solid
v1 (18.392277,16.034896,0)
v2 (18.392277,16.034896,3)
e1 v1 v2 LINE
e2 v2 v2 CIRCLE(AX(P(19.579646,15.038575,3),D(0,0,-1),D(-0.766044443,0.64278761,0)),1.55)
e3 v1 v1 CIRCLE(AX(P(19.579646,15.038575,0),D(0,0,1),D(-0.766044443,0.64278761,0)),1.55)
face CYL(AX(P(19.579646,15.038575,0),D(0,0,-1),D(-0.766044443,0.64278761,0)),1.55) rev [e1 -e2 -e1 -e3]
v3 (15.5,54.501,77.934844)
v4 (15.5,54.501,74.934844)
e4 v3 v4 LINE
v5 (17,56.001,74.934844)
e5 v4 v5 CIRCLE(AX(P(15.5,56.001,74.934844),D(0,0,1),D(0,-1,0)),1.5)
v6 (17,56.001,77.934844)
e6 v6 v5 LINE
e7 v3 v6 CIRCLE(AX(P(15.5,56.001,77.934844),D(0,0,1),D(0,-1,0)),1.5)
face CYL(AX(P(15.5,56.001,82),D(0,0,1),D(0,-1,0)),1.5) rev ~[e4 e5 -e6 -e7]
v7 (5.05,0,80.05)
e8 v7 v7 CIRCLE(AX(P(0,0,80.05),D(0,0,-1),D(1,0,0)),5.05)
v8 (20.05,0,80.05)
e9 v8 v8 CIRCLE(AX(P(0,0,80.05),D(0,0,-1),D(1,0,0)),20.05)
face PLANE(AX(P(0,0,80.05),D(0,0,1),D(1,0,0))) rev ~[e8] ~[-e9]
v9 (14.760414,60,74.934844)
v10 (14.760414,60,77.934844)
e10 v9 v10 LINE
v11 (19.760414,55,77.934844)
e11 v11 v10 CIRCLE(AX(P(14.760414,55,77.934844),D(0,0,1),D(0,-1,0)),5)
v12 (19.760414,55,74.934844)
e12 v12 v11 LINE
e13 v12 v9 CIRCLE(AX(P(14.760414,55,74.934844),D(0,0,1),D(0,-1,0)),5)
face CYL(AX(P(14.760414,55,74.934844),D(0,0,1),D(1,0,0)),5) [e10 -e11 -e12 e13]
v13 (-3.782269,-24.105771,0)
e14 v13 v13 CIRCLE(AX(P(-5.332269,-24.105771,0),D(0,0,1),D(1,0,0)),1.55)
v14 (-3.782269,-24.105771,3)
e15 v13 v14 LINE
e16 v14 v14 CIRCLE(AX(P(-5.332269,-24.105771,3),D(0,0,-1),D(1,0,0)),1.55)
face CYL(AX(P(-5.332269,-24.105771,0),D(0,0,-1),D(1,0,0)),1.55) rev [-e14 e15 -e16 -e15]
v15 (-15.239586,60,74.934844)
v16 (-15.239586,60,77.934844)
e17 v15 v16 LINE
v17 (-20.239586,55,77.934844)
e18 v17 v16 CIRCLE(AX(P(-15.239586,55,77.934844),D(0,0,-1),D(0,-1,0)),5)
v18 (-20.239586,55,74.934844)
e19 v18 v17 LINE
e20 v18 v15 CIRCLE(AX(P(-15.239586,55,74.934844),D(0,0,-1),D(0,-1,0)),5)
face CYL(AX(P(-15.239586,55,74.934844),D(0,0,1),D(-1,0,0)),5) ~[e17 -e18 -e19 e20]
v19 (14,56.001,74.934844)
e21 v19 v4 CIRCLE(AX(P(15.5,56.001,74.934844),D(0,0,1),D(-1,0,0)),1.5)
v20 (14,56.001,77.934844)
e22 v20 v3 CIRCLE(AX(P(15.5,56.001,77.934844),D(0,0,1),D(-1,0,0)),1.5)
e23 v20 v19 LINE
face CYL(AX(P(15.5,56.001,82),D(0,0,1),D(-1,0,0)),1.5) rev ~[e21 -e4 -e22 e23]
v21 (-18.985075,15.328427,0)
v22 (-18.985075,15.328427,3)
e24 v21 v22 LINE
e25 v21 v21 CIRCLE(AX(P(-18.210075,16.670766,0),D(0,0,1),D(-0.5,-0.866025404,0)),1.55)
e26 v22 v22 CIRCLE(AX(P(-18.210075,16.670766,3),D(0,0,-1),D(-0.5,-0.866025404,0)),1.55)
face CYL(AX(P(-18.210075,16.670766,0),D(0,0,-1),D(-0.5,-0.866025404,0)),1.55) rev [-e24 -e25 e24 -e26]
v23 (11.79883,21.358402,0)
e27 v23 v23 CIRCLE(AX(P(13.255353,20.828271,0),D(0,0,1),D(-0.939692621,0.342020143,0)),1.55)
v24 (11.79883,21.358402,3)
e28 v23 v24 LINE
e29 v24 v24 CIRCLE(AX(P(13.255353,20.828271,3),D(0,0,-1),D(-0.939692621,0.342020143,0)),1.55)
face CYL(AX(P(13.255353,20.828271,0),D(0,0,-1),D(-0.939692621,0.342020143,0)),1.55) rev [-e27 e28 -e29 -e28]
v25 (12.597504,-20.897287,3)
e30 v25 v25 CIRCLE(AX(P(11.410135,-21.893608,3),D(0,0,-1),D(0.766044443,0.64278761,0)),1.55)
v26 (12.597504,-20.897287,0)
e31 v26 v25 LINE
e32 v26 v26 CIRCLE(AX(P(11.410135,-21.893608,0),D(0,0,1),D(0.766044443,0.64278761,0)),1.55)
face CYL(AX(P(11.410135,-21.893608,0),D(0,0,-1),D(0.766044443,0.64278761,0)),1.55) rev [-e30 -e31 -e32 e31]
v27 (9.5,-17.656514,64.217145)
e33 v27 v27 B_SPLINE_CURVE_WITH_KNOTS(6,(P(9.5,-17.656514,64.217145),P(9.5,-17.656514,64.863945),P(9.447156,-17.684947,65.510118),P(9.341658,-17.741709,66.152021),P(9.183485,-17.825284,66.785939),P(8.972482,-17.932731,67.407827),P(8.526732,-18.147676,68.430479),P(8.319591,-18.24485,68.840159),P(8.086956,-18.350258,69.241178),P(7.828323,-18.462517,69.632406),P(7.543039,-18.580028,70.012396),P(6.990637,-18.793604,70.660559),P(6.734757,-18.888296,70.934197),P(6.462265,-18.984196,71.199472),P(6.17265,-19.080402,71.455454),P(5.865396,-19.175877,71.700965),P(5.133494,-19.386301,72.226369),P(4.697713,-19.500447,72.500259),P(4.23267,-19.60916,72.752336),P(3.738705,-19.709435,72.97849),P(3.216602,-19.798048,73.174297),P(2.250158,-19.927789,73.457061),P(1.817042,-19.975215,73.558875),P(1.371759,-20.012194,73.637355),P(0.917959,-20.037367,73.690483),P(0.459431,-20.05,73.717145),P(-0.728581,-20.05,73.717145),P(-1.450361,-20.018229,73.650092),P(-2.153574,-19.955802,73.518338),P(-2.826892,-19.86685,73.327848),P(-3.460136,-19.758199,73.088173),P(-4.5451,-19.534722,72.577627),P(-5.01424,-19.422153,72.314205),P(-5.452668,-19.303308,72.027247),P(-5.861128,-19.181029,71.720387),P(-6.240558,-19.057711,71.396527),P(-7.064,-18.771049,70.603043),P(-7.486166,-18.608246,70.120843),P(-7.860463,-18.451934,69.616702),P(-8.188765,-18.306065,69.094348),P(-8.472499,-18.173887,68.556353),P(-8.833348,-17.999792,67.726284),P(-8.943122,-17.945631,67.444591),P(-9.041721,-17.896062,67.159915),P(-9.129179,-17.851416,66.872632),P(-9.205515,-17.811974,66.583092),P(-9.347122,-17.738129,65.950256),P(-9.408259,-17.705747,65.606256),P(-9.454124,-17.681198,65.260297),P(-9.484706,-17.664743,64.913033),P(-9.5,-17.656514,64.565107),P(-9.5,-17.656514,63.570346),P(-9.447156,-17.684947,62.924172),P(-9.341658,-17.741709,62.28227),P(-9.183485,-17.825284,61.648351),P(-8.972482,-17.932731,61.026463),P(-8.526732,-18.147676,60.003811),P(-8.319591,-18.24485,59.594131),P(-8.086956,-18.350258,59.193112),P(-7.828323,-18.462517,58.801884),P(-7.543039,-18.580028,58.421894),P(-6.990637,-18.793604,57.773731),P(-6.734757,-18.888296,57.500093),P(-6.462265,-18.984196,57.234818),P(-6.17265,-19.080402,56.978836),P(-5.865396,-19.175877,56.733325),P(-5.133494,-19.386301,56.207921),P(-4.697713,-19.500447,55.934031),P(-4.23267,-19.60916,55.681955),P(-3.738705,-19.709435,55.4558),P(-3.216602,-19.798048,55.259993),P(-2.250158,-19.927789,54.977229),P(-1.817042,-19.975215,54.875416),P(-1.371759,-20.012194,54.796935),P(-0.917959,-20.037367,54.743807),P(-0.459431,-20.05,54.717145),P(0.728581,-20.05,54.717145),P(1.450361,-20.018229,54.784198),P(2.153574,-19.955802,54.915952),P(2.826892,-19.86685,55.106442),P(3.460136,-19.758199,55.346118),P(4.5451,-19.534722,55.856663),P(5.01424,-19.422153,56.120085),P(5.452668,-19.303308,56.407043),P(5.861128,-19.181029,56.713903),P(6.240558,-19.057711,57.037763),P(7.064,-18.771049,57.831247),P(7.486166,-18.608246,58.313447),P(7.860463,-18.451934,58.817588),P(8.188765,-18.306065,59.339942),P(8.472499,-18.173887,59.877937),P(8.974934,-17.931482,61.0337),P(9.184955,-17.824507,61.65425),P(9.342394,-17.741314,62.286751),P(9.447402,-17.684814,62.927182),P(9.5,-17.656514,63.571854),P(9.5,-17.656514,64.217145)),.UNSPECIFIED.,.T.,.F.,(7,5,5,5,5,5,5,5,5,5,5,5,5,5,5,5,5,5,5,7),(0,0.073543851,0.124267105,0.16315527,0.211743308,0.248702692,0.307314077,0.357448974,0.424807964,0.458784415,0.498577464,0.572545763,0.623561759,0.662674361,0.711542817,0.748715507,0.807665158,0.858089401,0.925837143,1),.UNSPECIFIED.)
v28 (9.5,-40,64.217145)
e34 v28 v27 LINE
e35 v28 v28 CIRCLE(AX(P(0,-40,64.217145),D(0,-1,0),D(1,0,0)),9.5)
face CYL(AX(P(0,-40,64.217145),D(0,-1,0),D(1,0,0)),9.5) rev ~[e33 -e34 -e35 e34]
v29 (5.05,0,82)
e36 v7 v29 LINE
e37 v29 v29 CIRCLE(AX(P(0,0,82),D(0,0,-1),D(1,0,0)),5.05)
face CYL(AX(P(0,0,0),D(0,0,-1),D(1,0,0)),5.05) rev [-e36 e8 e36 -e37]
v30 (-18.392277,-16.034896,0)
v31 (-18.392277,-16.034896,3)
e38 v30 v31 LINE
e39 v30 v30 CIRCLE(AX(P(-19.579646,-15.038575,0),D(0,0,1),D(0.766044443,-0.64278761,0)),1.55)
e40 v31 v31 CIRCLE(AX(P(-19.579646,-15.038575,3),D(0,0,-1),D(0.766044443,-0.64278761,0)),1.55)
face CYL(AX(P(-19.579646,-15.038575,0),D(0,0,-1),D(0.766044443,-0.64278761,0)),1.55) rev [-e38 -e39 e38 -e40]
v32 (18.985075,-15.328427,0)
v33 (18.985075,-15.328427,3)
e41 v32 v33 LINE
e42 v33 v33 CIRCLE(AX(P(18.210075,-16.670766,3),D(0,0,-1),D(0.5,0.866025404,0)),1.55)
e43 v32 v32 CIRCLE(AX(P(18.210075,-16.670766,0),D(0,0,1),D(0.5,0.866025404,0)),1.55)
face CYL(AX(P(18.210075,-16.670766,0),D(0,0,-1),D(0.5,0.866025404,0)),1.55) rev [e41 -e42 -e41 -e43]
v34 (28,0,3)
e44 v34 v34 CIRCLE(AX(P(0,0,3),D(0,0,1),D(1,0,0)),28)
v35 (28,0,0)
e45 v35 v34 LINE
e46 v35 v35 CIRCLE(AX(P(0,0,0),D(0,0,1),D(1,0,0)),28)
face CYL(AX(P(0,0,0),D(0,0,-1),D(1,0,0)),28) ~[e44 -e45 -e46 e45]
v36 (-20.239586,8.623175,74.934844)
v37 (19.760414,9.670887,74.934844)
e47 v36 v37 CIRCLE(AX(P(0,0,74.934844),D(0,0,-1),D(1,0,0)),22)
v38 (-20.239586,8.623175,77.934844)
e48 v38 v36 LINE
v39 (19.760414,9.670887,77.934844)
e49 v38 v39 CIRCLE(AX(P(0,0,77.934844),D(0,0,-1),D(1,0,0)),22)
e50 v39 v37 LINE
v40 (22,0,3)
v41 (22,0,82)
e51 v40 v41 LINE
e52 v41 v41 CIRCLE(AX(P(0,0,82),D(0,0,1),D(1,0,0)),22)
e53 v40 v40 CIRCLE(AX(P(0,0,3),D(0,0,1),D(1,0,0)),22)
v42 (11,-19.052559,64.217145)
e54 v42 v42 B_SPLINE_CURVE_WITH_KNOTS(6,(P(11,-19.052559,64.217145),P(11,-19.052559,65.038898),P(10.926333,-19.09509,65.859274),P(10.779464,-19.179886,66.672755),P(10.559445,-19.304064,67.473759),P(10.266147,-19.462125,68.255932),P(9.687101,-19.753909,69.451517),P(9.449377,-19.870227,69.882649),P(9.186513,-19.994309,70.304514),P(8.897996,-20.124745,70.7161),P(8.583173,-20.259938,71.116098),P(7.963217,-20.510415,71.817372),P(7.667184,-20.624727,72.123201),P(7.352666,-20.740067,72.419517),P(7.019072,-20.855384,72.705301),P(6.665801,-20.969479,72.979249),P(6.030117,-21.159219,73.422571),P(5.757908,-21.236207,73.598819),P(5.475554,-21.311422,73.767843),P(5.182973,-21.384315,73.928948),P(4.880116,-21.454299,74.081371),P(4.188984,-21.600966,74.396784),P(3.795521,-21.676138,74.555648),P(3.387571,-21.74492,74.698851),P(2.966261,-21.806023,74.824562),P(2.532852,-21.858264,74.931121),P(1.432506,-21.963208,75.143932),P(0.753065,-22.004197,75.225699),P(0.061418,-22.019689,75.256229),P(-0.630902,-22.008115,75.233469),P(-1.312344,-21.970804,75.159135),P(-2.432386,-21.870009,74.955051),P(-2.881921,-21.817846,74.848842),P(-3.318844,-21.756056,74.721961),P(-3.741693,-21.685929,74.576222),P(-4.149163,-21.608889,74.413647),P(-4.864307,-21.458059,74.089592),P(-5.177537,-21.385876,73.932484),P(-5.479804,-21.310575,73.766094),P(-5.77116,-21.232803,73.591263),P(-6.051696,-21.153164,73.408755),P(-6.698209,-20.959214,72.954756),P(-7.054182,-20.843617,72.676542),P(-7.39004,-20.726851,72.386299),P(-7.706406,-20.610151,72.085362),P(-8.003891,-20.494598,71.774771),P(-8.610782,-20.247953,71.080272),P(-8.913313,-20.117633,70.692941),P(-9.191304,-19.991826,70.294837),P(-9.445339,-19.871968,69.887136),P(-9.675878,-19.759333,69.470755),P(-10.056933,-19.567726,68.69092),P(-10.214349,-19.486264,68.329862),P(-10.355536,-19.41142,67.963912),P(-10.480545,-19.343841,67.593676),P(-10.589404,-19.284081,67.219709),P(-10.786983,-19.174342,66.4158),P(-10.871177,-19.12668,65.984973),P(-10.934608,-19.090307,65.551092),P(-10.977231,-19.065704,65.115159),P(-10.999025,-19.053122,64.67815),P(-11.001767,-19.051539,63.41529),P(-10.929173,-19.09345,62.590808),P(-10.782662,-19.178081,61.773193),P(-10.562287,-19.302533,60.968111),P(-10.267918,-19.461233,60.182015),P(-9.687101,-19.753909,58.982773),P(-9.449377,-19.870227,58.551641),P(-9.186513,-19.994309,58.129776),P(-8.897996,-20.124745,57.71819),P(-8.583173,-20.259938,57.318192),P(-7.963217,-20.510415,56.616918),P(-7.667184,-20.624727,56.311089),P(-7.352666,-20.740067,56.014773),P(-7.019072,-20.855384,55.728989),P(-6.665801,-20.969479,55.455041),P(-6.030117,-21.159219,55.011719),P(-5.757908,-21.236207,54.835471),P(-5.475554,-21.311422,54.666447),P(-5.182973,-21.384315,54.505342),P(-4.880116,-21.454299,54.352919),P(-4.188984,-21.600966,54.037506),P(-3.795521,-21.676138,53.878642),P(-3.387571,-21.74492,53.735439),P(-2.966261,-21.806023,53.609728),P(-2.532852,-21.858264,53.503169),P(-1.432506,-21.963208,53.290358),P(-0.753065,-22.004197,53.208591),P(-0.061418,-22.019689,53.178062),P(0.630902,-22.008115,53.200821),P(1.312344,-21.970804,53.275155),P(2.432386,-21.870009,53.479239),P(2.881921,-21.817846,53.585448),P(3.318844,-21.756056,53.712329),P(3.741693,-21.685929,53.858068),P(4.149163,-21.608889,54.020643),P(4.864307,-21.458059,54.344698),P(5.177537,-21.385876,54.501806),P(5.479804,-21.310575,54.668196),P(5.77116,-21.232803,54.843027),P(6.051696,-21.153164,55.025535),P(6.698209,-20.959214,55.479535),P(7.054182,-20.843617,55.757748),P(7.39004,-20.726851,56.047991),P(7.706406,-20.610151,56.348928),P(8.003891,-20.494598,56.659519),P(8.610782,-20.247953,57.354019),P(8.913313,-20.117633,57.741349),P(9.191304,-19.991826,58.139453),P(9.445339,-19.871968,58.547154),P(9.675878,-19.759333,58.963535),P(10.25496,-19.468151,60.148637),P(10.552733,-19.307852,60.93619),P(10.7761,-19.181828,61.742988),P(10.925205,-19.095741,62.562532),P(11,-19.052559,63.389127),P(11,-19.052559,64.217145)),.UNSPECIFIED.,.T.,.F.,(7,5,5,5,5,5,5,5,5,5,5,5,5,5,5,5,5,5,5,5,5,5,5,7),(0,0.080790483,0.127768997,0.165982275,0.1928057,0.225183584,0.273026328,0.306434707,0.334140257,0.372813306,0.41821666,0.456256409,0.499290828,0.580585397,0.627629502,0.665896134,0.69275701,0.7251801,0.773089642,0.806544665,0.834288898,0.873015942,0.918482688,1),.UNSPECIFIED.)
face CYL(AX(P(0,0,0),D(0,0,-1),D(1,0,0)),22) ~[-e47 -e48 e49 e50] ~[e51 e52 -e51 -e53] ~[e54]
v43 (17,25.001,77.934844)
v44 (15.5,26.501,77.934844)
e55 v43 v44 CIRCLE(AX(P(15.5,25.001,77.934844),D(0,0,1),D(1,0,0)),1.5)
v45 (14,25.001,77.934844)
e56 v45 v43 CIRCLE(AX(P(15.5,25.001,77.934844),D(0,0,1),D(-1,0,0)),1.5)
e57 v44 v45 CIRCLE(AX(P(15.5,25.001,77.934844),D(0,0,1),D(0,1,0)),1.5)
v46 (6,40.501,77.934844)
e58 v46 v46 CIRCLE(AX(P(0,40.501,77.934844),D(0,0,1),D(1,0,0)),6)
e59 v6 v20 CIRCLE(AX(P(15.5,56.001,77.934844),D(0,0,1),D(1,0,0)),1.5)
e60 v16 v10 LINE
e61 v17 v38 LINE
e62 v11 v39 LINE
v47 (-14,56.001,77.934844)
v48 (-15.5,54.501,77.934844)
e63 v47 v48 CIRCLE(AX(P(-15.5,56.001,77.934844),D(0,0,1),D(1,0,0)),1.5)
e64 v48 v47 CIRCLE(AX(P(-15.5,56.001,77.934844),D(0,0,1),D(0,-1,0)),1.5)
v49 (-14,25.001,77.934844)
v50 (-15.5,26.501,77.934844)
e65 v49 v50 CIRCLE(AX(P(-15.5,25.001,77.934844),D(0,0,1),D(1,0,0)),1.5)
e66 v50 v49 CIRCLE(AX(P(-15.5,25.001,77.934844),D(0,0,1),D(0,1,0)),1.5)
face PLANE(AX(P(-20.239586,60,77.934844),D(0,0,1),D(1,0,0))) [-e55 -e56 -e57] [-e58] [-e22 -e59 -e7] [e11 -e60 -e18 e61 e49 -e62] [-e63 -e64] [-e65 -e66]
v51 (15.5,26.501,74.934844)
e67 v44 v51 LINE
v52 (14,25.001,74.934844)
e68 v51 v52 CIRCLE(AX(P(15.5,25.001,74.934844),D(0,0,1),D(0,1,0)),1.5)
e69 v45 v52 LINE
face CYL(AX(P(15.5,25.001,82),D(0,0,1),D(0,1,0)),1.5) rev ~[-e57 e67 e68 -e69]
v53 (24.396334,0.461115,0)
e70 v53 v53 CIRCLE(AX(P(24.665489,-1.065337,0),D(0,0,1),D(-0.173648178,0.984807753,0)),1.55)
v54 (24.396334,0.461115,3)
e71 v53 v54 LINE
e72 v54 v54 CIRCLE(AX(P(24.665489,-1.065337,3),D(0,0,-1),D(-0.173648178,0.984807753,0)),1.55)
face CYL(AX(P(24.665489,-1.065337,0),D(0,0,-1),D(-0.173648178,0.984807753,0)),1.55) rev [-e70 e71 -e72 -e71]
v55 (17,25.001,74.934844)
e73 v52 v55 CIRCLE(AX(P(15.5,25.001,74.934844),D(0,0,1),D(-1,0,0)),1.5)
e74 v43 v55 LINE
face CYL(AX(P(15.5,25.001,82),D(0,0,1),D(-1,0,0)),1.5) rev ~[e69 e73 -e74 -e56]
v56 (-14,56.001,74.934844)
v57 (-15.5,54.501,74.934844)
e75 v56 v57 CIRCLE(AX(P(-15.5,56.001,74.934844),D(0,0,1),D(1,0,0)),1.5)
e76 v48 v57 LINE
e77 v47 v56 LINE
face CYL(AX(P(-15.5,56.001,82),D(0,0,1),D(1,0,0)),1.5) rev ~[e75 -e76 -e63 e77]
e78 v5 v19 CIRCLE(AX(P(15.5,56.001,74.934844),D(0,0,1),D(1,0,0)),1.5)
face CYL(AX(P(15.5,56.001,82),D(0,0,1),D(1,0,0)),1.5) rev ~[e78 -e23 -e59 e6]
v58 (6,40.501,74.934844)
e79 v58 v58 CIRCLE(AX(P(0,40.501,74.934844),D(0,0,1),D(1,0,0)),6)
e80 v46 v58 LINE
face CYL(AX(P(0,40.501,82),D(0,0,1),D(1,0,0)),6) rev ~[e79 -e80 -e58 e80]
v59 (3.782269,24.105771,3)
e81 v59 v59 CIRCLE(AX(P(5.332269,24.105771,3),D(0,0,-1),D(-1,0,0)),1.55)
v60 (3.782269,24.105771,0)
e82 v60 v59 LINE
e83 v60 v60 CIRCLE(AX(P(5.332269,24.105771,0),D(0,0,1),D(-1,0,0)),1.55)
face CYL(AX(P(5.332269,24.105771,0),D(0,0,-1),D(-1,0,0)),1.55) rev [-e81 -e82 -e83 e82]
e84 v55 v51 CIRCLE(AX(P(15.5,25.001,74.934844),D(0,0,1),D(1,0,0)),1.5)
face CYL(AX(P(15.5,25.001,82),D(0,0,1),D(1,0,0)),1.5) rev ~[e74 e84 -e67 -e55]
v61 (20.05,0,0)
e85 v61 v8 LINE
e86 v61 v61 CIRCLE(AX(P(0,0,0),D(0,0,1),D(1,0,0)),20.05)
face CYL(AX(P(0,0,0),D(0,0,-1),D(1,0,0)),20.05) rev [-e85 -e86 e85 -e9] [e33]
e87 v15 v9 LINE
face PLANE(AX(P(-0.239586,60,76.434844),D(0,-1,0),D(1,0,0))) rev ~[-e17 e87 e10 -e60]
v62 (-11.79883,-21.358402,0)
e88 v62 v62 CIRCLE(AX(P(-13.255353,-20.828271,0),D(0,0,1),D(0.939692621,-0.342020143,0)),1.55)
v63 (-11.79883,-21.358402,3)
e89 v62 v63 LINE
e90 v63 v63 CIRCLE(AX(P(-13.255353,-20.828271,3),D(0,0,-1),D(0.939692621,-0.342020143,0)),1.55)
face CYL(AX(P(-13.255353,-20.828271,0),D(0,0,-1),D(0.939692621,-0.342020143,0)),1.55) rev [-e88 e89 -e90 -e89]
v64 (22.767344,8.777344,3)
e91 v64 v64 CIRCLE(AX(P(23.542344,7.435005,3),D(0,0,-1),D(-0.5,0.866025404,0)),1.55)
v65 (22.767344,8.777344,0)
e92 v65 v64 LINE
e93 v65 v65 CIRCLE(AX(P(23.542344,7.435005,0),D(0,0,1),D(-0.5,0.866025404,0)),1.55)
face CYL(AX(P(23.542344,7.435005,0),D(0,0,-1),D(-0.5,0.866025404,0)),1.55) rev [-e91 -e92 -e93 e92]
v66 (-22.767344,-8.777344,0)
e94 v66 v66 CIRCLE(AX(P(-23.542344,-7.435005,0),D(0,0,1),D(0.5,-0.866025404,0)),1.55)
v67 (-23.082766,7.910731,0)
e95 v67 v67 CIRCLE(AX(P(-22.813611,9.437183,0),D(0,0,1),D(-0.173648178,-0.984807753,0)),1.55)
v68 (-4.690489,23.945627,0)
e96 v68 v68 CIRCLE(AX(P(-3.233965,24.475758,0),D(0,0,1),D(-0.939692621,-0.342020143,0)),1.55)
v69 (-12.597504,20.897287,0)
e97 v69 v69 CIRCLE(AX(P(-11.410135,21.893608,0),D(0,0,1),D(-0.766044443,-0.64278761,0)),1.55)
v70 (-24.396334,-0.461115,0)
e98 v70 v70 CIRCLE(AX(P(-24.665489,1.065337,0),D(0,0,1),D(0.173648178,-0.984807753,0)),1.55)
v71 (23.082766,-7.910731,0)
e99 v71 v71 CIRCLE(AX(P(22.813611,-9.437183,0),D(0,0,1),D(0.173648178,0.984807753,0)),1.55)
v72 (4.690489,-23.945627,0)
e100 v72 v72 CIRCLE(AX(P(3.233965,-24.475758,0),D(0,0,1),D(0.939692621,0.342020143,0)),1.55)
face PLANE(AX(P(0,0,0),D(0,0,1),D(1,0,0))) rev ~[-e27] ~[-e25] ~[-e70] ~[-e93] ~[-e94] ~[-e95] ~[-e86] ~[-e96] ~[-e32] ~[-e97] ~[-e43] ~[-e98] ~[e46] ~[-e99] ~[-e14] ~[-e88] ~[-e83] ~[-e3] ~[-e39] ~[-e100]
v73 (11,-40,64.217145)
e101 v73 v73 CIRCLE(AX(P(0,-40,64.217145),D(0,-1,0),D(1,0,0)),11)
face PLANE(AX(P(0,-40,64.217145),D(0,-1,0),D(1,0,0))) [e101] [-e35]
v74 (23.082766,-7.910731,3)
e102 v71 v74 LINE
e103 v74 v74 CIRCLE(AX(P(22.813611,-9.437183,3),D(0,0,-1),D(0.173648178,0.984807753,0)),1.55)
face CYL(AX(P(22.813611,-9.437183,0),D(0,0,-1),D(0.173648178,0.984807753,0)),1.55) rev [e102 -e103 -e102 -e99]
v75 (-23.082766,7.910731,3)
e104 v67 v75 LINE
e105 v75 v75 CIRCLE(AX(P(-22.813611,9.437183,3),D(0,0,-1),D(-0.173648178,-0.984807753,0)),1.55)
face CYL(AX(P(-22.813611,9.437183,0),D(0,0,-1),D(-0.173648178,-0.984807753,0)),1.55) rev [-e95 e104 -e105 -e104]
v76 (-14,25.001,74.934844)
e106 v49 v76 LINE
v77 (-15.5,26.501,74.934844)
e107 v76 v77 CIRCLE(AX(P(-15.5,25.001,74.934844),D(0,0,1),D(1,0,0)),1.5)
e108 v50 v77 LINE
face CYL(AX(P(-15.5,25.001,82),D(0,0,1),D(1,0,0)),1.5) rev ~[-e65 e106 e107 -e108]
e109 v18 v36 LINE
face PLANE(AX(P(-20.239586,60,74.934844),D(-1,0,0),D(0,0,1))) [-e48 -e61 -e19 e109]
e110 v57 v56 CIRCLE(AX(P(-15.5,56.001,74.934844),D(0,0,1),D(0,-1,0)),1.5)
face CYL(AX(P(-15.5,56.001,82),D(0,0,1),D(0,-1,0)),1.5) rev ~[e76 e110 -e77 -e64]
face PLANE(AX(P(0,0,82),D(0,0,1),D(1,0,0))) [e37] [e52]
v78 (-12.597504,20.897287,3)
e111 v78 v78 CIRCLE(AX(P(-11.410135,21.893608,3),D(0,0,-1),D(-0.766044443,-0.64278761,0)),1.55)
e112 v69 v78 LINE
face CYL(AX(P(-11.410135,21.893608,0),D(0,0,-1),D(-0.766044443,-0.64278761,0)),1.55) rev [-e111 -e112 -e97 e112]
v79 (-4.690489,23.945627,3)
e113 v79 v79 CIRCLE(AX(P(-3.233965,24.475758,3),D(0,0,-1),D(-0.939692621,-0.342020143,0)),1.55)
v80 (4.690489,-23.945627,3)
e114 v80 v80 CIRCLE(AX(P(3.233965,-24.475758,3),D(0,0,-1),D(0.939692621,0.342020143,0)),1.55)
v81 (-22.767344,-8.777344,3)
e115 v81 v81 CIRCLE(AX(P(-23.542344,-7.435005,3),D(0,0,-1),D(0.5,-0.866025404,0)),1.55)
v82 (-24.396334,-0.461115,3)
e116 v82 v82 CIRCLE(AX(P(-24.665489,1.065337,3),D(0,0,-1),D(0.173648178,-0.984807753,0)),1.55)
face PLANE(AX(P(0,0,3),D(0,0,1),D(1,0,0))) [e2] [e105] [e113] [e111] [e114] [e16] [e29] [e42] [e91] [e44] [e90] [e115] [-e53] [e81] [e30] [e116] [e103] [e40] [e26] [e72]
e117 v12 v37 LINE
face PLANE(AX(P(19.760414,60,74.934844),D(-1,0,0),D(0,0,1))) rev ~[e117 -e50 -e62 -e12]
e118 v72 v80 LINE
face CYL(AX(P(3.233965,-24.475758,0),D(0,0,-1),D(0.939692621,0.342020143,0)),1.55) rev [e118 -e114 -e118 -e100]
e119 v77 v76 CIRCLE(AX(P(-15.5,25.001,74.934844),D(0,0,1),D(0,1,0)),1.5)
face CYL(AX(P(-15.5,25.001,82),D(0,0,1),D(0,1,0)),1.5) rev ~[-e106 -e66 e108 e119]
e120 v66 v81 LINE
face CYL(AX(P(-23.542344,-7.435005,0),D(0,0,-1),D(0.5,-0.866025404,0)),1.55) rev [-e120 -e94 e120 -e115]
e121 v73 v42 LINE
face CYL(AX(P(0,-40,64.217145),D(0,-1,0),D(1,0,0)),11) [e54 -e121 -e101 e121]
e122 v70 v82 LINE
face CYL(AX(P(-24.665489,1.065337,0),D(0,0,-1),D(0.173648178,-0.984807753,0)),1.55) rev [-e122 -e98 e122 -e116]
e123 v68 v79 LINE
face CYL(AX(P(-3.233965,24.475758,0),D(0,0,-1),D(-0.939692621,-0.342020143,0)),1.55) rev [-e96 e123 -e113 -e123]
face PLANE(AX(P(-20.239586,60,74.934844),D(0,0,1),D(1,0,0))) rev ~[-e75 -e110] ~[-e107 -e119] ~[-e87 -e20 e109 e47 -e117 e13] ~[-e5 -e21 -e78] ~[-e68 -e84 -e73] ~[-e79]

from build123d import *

# Parameters (mm, degrees)
F0_R            = 22
F1_DEPTH        = 82
F2_T            = -1.95
F0_R_2          = 28
F3_DEPTH        = 3
F5_R            = 5.05
F6_DEPTH        = 90
F7_R            = 1.55
F8_DEPTH        = 5
F8_COPIES_COUNT = 18
F10_R           = 11
F12_R           = 9.5
F13_DEPTH       = 30
F15_W           = 40
F15_H           = 3
F17_R           = 6
F18_DEPTH       = 10
F19_R           = 5


# Not quite as in the source:
# - a pattern or mirror of a feature is missing from the dataset's text; its kind, count and spacing are read off the source's solid


with BuildPart() as f1:
    # F0 (on Top) → F1 (new body)
    with BuildSketch(Plane.XY):
        Circle(F0_R)
    extrude(amount=F1_DEPTH)

    # F2
    f2_openings = [f1.faces().sort_by_distance(p)[0] for p in [
        (0, 0, 0),
    ]]
    offset(amount=F2_T, openings=f2_openings)

    # F0 (on Top) → F3 (join)
    with BuildSketch(Plane.XY):
        Circle(F0_R_2)
        Circle(F0_R, mode=Mode.SUBTRACT)
    extrude(amount=F3_DEPTH)

    # F5 (on Top) → F6 (cut)
    with BuildSketch(Plane.XY):
        Circle(F5_R)
    extrude(amount=F6_DEPTH, mode=Mode.SUBTRACT)

    # F7 (on face) → F8 (cut)
    with BuildSketch(Plane.XY):
        with Locations((-5.3322692402, -24.1057705134)):
            Circle(F7_R)
    f8 = extrude(amount=F8_DEPTH, mode=Mode.SUBTRACT)

    # F8_copies: F8 ×18 about axis
    f8_copies_axis = Axis((0, 0, 0), (0, 0, 1))
    for i in range(1, F8_COPIES_COUNT):
        add(f8.rotate(f8_copies_axis, i * 360 / F8_COPIES_COUNT), mode=Mode.SUBTRACT)

    # F10 (on offset) → F11 (join, up to the next surface of F1)
    with BuildSketch(Plane.XZ.offset(40)):
        with Locations((0, 64.2171450533)):
            Circle(F10_R)
    extrude(until=Until.NEXT, dir=(0, 1, 0))

    # F12 (on face) → F13 (cut)
    with BuildSketch(Plane.XZ.offset(40)):
        with Locations((0, 64.2171450533)):
            Circle(F12_R)
    extrude(amount=-F13_DEPTH, mode=Mode.SUBTRACT)

    # F15 (on offset) → F16 (join, up to the next surface of F1)
    with BuildSketch(Plane.XZ.offset(-60)):
        with Locations((-0.2395864576, 76.434844184)):
            Rectangle(F15_W, F15_H)
    extrude(until=Until.NEXT)

    # F17 (on face) → F18 (cut)
    with BuildSketch(Plane.XY.offset(82)):
        with BuildLine():
            Line((15.5, 56.001), (15.5, 54.501))
            ThreePointArc((15.5, 54.501), (16.5606601718, 54.9403398282), (17, 56.001))
            ThreePointArc((17, 56.001), (15.5, 57.501), (14, 56.001))
            Line((14, 56.001), (15.5, 56.001))
        make_face()
        with BuildLine():
            ThreePointArc((14, 56.001), (14.4393398282, 54.9403398282), (15.5, 54.501))
            Line((15.5, 54.501), (15.5, 56.001))
            Line((15.5, 56.001), (14, 56.001))
        make_face()
        with BuildLine():
            ThreePointArc((-14, 56.001), (-16.5606601718, 57.0616601718), (-15.5, 54.501))
            Line((-15.5, 54.501), (-15.5, 56.001))
            Line((-15.5, 56.001), (-14, 56.001))
        make_face()
        with BuildLine():
            Line((-15.5, 56.001), (-15.5, 54.501))
            ThreePointArc((-15.5, 54.501), (-14.4393398282, 54.9403398282), (-14, 56.001))
            Line((-14, 56.001), (-15.5, 56.001))
        make_face()
        with BuildLine():
            ThreePointArc((-15.5, 26.501), (-16.5606601718, 23.9403398282), (-14, 25.001))
            Line((-14, 25.001), (-15.5, 25.001))
            Line((-15.5, 25.001), (-15.5, 26.501))
        make_face()
        with BuildLine():
            Line((-15.5, 25.001), (-14, 25.001))
            ThreePointArc((-14, 25.001), (-14.4393398282, 26.0616601718), (-15.5, 26.501))
            Line((-15.5, 26.501), (-15.5, 25.001))
        make_face()
        with BuildLine():
            Line((15.5, 25.001), (14, 25.001))
            ThreePointArc((14, 25.001), (15.5, 23.501), (17, 25.001))
            ThreePointArc((17, 25.001), (16.5606601718, 26.0616601718), (15.5, 26.501))
            Line((15.5, 26.501), (15.5, 25.001))
        make_face()
        with BuildLine():
            ThreePointArc((15.5, 26.501), (14.4393398282, 26.0616601718), (14, 25.001))
            Line((14, 25.001), (15.5, 25.001))
            Line((15.5, 25.001), (15.5, 26.501))
        make_face()
        with Locations((0, 40.501)):
            Circle(F17_R)
    extrude(amount=-F18_DEPTH, mode=Mode.SUBTRACT)

    # F19
    f19_edges = [f1.edges().sort_by_distance(p)[0] for p in [
        (-20.239586, 60, 76.434844),
        (19.760414, 60, 76.434844),
    ]]
    fillet(f19_edges, radius=F19_R)


solid = f1.part
